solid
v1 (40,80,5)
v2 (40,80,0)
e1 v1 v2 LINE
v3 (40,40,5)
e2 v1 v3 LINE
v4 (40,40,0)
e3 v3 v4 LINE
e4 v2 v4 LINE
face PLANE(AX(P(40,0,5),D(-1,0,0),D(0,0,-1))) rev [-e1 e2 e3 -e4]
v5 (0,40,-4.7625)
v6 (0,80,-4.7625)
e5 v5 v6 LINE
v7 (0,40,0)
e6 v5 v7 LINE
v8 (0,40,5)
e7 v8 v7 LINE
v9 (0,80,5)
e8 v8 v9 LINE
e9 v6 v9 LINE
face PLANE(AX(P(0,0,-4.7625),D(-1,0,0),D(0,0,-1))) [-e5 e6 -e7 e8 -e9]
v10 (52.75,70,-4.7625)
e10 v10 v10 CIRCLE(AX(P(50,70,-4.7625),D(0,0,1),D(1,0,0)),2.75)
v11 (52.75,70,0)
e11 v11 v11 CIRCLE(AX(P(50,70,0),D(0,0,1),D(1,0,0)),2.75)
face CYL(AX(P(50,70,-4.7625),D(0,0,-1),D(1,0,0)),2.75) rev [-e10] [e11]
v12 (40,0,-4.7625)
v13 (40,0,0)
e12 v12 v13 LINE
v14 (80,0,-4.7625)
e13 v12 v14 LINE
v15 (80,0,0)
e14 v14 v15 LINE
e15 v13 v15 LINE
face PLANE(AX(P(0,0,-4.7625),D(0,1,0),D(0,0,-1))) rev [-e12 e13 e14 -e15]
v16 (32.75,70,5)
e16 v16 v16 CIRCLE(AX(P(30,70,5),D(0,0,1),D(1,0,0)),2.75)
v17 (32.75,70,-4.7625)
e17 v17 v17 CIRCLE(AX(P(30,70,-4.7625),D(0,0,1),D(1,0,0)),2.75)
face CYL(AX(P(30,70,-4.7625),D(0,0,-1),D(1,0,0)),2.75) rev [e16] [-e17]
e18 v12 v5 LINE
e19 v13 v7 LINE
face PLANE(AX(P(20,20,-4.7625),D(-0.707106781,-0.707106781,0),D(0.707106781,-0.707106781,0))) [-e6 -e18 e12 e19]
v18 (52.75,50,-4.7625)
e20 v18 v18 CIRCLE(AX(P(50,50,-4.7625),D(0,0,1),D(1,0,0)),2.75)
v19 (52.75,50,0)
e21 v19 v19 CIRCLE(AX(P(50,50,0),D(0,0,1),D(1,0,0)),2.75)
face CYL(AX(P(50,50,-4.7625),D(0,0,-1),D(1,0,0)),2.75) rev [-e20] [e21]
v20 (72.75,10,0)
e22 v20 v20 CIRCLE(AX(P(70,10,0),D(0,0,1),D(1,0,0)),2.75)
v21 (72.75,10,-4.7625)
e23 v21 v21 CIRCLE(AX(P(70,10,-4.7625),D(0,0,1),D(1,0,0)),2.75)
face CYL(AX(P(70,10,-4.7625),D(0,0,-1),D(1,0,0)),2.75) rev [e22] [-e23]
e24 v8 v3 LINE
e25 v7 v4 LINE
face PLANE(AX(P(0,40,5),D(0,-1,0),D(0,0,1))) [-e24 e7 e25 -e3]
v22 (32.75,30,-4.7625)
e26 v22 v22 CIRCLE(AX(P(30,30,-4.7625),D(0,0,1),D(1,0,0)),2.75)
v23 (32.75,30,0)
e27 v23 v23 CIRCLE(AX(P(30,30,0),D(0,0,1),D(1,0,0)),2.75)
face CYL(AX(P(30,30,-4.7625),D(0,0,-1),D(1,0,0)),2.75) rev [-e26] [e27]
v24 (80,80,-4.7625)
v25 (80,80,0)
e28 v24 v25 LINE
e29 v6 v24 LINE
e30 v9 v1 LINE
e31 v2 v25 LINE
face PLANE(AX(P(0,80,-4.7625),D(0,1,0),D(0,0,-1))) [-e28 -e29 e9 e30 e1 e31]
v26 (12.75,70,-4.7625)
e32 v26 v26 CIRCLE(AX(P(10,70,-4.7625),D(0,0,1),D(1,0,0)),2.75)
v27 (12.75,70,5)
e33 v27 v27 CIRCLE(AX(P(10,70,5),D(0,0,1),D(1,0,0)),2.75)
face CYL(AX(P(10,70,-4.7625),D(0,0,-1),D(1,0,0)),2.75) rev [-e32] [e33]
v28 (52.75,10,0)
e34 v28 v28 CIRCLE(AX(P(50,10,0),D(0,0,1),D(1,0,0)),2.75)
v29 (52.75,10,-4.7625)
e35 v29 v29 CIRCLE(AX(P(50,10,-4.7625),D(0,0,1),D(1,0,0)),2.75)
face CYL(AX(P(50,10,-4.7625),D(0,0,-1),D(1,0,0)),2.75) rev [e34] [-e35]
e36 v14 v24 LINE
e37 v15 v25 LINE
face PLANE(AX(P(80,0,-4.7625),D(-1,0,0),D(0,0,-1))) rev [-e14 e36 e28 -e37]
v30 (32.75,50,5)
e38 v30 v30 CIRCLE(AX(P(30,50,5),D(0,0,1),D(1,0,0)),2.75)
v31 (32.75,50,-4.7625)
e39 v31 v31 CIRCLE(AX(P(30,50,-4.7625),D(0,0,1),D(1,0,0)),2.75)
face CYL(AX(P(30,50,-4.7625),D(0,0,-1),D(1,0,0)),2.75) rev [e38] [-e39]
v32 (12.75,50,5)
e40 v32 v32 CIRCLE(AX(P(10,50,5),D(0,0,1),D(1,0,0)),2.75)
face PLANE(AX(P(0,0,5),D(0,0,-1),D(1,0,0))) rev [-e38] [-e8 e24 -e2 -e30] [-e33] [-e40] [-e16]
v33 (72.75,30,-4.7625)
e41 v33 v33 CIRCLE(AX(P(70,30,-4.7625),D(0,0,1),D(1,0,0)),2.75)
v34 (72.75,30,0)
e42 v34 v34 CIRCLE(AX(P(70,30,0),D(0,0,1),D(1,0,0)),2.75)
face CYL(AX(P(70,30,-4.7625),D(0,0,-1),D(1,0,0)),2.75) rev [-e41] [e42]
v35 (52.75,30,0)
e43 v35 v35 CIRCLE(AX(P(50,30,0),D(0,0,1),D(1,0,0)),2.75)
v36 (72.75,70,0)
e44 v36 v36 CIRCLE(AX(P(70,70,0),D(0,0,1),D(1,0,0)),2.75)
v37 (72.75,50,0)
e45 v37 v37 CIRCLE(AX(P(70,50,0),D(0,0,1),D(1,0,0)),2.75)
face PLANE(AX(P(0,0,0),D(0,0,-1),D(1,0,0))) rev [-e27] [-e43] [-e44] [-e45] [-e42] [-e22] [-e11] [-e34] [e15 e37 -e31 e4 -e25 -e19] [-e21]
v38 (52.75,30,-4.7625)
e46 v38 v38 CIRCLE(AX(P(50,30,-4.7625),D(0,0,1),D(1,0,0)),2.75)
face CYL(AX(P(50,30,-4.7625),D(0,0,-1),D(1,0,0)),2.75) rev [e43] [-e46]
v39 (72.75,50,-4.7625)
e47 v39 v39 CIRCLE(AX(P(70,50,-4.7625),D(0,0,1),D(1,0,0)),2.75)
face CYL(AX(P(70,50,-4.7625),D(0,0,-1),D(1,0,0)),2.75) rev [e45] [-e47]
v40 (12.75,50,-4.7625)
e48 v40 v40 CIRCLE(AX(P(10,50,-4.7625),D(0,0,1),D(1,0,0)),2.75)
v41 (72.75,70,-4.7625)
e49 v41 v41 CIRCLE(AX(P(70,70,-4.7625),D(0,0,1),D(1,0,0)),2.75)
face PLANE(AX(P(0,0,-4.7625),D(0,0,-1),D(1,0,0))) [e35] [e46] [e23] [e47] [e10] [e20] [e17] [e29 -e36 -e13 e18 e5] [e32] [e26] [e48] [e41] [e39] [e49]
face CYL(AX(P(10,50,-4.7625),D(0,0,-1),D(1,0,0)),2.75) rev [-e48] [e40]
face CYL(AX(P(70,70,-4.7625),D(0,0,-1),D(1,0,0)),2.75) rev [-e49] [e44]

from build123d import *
from build123d.topology import SkipClean

# Parameters (mm, degrees)
SKETCH1_W                   = 40
SKETCH1_H                   = 40
BOSS_EXTRUDE1_DEPTH         = 4.7625
SKETCH1_3_W                 = 40
SKETCH1_3_H                 = 40
BOSS_EXTRUDE2_DEPTH         = 5
M5_CLEARANCE_HOLE1_D        = 5.5
BODY_MOVE_COPY1_OUTLINE_R   = 2.75
BODY_MOVE_COPY1_DEPTH       = 4.7625
BODY_MOVE_COPY1_START       = -5
BODY_MOVE_COPY1_2_OUTLINE_W = 40
BODY_MOVE_COPY1_2_OUTLINE_H = 40
BODY_MOVE_COPY1_2_OUTLINE_R = 2.75
BODY_MOVE_COPY1_2_DEPTH     = 0.2375
BODY_MOVE_COPY1_START_2     = -4.7625
BODY_MOVE_COPY1_3_OUTLINE_R = 2.75
BODY_MOVE_COPY1_3_DEPTH     = 4.7625
BODY_MOVE_COPY1_START_3     = 4.7625
BODY_MOVE_COPY1_4_OUTLINE_W = 40
BODY_MOVE_COPY1_4_OUTLINE_H = 40
BODY_MOVE_COPY1_4_OUTLINE_R = 2.75
BODY_MOVE_COPY1_4_DEPTH     = 0.2375


# Read off the part's stored shape, not the designer's step: Body-Move/Copy1
with BuildPart() as part:
    # Sketch1 → Boss-Extrude1 (new body)
    with BuildSketch(Plane.XY):
        with Locations((20, 60)):
            Rectangle(SKETCH1_W, SKETCH1_H)
        with Locations((60, 60)):
            Rectangle(SKETCH1_W, SKETCH1_H)
        with Locations((60, 20)):
            Rectangle(SKETCH1_W, SKETCH1_H)
        Polygon((40, 40), (0, 40), (40, 0), align=None)
    extrude(amount=BOSS_EXTRUDE1_DEPTH)

    # Sketch1<3> → Boss-Extrude2 (add)
    with BuildSketch(Plane.XY):
        with Locations((20, 60)):
            Rectangle(SKETCH1_3_W, SKETCH1_3_H)
    extrude(amount=-BOSS_EXTRUDE2_DEPTH)

    # M5 Clearance Hole1 (through all)
    with Locations(Plane.XY.offset(4.7625)):
        with Locations((10, 70), (30, 70), (50, 70), (70, 70), (30, 50), (50, 50), (70, 50), (30, 30), (50, 30), (70, 30), (50, 10), (70, 10), (10, 50)):
            Hole(M5_CLEARANCE_HOLE1_D / 2)

    # Body-Move/Copy1 outline → Body-Move/Copy1 (cut)
    with BuildSketch(Plane.XY):
        Polygon((40, 0), (80, 0), (80, 80), (40, 80), (40, 40), (0, 40), align=None)
        with Locations((30, 30)):
            Circle(BODY_MOVE_COPY1_OUTLINE_R, mode=Mode.SUBTRACT)
        with Locations((50, 10)):
            Circle(BODY_MOVE_COPY1_OUTLINE_R, mode=Mode.SUBTRACT)
        with Locations((70, 10)):
            Circle(BODY_MOVE_COPY1_OUTLINE_R, mode=Mode.SUBTRACT)
        with Locations((50, 30)):
            Circle(BODY_MOVE_COPY1_OUTLINE_R, mode=Mode.SUBTRACT)
        with Locations((70, 30)):
            Circle(BODY_MOVE_COPY1_OUTLINE_R, mode=Mode.SUBTRACT)
        with Locations((50, 50)):
            Circle(BODY_MOVE_COPY1_OUTLINE_R, mode=Mode.SUBTRACT)
        with Locations((70, 50)):
            Circle(BODY_MOVE_COPY1_OUTLINE_R, mode=Mode.SUBTRACT)
        with Locations((50, 70)):
            Circle(BODY_MOVE_COPY1_OUTLINE_R, mode=Mode.SUBTRACT)
        with Locations((70, 70)):
            Circle(BODY_MOVE_COPY1_OUTLINE_R, mode=Mode.SUBTRACT)
    extrude(amount=BODY_MOVE_COPY1_DEPTH, mode=Mode.SUBTRACT)

    # Body-Move_Copy1 2 outline → Body-Move_Copy1 2 (cut)
    with BuildSketch(Plane.XY.offset(BODY_MOVE_COPY1_START)):
        with Locations((20, 60)):
            Rectangle(BODY_MOVE_COPY1_2_OUTLINE_W, BODY_MOVE_COPY1_2_OUTLINE_H)
        with Locations((10, 50)):
            Circle(BODY_MOVE_COPY1_2_OUTLINE_R, mode=Mode.SUBTRACT)
        with Locations((30, 50)):
            Circle(BODY_MOVE_COPY1_2_OUTLINE_R, mode=Mode.SUBTRACT)
        with Locations((10, 70)):
            Circle(BODY_MOVE_COPY1_2_OUTLINE_R, mode=Mode.SUBTRACT)
        with Locations((30, 70)):
            Circle(BODY_MOVE_COPY1_2_OUTLINE_R, mode=Mode.SUBTRACT)
    extrude(amount=BODY_MOVE_COPY1_2_DEPTH, mode=Mode.SUBTRACT)

    # Body-Move_Copy1 3 outline → Body-Move_Copy1 3 (add)
    with BuildSketch(Plane.XY.offset(BODY_MOVE_COPY1_START_2)):
        Polygon((40, 0), (80, 0), (80, 80), (40, 80), (40, 40), (0, 40), align=None)
        with Locations((30, 30)):
            Circle(BODY_MOVE_COPY1_3_OUTLINE_R, mode=Mode.SUBTRACT)
        with Locations((50, 10)):
            Circle(BODY_MOVE_COPY1_3_OUTLINE_R, mode=Mode.SUBTRACT)
        with Locations((70, 10)):
            Circle(BODY_MOVE_COPY1_3_OUTLINE_R, mode=Mode.SUBTRACT)
        with Locations((50, 30)):
            Circle(BODY_MOVE_COPY1_3_OUTLINE_R, mode=Mode.SUBTRACT)
        with Locations((70, 30)):
            Circle(BODY_MOVE_COPY1_3_OUTLINE_R, mode=Mode.SUBTRACT)
        with Locations((50, 50)):
            Circle(BODY_MOVE_COPY1_3_OUTLINE_R, mode=Mode.SUBTRACT)
        with Locations((70, 50)):
            Circle(BODY_MOVE_COPY1_3_OUTLINE_R, mode=Mode.SUBTRACT)
        with Locations((50, 70)):
            Circle(BODY_MOVE_COPY1_3_OUTLINE_R, mode=Mode.SUBTRACT)
        with Locations((70, 70)):
            Circle(BODY_MOVE_COPY1_3_OUTLINE_R, mode=Mode.SUBTRACT)
    extrude(amount=BODY_MOVE_COPY1_3_DEPTH)

    # Body-Move_Copy1 4 outline → Body-Move_Copy1 4 (add)
    with SkipClean():  # the faces are left unmerged after this step: merging them gives an invalid solid
        with BuildSketch(Plane.XY.offset(BODY_MOVE_COPY1_START_3)):
            with Locations((20, 60)):
                Rectangle(BODY_MOVE_COPY1_4_OUTLINE_W, BODY_MOVE_COPY1_4_OUTLINE_H)
            with Locations((10, 50)):
                Circle(BODY_MOVE_COPY1_4_OUTLINE_R, mode=Mode.SUBTRACT)
            with Locations((30, 50)):
                Circle(BODY_MOVE_COPY1_4_OUTLINE_R, mode=Mode.SUBTRACT)
            with Locations((10, 70)):
                Circle(BODY_MOVE_COPY1_4_OUTLINE_R, mode=Mode.SUBTRACT)
            with Locations((30, 70)):
                Circle(BODY_MOVE_COPY1_4_OUTLINE_R, mode=Mode.SUBTRACT)
        extrude(amount=BODY_MOVE_COPY1_4_DEPTH)
    add(part.part.scale(1), mode=Mode.REPLACE)  # the faces are merged on a copy


solid = part.part
